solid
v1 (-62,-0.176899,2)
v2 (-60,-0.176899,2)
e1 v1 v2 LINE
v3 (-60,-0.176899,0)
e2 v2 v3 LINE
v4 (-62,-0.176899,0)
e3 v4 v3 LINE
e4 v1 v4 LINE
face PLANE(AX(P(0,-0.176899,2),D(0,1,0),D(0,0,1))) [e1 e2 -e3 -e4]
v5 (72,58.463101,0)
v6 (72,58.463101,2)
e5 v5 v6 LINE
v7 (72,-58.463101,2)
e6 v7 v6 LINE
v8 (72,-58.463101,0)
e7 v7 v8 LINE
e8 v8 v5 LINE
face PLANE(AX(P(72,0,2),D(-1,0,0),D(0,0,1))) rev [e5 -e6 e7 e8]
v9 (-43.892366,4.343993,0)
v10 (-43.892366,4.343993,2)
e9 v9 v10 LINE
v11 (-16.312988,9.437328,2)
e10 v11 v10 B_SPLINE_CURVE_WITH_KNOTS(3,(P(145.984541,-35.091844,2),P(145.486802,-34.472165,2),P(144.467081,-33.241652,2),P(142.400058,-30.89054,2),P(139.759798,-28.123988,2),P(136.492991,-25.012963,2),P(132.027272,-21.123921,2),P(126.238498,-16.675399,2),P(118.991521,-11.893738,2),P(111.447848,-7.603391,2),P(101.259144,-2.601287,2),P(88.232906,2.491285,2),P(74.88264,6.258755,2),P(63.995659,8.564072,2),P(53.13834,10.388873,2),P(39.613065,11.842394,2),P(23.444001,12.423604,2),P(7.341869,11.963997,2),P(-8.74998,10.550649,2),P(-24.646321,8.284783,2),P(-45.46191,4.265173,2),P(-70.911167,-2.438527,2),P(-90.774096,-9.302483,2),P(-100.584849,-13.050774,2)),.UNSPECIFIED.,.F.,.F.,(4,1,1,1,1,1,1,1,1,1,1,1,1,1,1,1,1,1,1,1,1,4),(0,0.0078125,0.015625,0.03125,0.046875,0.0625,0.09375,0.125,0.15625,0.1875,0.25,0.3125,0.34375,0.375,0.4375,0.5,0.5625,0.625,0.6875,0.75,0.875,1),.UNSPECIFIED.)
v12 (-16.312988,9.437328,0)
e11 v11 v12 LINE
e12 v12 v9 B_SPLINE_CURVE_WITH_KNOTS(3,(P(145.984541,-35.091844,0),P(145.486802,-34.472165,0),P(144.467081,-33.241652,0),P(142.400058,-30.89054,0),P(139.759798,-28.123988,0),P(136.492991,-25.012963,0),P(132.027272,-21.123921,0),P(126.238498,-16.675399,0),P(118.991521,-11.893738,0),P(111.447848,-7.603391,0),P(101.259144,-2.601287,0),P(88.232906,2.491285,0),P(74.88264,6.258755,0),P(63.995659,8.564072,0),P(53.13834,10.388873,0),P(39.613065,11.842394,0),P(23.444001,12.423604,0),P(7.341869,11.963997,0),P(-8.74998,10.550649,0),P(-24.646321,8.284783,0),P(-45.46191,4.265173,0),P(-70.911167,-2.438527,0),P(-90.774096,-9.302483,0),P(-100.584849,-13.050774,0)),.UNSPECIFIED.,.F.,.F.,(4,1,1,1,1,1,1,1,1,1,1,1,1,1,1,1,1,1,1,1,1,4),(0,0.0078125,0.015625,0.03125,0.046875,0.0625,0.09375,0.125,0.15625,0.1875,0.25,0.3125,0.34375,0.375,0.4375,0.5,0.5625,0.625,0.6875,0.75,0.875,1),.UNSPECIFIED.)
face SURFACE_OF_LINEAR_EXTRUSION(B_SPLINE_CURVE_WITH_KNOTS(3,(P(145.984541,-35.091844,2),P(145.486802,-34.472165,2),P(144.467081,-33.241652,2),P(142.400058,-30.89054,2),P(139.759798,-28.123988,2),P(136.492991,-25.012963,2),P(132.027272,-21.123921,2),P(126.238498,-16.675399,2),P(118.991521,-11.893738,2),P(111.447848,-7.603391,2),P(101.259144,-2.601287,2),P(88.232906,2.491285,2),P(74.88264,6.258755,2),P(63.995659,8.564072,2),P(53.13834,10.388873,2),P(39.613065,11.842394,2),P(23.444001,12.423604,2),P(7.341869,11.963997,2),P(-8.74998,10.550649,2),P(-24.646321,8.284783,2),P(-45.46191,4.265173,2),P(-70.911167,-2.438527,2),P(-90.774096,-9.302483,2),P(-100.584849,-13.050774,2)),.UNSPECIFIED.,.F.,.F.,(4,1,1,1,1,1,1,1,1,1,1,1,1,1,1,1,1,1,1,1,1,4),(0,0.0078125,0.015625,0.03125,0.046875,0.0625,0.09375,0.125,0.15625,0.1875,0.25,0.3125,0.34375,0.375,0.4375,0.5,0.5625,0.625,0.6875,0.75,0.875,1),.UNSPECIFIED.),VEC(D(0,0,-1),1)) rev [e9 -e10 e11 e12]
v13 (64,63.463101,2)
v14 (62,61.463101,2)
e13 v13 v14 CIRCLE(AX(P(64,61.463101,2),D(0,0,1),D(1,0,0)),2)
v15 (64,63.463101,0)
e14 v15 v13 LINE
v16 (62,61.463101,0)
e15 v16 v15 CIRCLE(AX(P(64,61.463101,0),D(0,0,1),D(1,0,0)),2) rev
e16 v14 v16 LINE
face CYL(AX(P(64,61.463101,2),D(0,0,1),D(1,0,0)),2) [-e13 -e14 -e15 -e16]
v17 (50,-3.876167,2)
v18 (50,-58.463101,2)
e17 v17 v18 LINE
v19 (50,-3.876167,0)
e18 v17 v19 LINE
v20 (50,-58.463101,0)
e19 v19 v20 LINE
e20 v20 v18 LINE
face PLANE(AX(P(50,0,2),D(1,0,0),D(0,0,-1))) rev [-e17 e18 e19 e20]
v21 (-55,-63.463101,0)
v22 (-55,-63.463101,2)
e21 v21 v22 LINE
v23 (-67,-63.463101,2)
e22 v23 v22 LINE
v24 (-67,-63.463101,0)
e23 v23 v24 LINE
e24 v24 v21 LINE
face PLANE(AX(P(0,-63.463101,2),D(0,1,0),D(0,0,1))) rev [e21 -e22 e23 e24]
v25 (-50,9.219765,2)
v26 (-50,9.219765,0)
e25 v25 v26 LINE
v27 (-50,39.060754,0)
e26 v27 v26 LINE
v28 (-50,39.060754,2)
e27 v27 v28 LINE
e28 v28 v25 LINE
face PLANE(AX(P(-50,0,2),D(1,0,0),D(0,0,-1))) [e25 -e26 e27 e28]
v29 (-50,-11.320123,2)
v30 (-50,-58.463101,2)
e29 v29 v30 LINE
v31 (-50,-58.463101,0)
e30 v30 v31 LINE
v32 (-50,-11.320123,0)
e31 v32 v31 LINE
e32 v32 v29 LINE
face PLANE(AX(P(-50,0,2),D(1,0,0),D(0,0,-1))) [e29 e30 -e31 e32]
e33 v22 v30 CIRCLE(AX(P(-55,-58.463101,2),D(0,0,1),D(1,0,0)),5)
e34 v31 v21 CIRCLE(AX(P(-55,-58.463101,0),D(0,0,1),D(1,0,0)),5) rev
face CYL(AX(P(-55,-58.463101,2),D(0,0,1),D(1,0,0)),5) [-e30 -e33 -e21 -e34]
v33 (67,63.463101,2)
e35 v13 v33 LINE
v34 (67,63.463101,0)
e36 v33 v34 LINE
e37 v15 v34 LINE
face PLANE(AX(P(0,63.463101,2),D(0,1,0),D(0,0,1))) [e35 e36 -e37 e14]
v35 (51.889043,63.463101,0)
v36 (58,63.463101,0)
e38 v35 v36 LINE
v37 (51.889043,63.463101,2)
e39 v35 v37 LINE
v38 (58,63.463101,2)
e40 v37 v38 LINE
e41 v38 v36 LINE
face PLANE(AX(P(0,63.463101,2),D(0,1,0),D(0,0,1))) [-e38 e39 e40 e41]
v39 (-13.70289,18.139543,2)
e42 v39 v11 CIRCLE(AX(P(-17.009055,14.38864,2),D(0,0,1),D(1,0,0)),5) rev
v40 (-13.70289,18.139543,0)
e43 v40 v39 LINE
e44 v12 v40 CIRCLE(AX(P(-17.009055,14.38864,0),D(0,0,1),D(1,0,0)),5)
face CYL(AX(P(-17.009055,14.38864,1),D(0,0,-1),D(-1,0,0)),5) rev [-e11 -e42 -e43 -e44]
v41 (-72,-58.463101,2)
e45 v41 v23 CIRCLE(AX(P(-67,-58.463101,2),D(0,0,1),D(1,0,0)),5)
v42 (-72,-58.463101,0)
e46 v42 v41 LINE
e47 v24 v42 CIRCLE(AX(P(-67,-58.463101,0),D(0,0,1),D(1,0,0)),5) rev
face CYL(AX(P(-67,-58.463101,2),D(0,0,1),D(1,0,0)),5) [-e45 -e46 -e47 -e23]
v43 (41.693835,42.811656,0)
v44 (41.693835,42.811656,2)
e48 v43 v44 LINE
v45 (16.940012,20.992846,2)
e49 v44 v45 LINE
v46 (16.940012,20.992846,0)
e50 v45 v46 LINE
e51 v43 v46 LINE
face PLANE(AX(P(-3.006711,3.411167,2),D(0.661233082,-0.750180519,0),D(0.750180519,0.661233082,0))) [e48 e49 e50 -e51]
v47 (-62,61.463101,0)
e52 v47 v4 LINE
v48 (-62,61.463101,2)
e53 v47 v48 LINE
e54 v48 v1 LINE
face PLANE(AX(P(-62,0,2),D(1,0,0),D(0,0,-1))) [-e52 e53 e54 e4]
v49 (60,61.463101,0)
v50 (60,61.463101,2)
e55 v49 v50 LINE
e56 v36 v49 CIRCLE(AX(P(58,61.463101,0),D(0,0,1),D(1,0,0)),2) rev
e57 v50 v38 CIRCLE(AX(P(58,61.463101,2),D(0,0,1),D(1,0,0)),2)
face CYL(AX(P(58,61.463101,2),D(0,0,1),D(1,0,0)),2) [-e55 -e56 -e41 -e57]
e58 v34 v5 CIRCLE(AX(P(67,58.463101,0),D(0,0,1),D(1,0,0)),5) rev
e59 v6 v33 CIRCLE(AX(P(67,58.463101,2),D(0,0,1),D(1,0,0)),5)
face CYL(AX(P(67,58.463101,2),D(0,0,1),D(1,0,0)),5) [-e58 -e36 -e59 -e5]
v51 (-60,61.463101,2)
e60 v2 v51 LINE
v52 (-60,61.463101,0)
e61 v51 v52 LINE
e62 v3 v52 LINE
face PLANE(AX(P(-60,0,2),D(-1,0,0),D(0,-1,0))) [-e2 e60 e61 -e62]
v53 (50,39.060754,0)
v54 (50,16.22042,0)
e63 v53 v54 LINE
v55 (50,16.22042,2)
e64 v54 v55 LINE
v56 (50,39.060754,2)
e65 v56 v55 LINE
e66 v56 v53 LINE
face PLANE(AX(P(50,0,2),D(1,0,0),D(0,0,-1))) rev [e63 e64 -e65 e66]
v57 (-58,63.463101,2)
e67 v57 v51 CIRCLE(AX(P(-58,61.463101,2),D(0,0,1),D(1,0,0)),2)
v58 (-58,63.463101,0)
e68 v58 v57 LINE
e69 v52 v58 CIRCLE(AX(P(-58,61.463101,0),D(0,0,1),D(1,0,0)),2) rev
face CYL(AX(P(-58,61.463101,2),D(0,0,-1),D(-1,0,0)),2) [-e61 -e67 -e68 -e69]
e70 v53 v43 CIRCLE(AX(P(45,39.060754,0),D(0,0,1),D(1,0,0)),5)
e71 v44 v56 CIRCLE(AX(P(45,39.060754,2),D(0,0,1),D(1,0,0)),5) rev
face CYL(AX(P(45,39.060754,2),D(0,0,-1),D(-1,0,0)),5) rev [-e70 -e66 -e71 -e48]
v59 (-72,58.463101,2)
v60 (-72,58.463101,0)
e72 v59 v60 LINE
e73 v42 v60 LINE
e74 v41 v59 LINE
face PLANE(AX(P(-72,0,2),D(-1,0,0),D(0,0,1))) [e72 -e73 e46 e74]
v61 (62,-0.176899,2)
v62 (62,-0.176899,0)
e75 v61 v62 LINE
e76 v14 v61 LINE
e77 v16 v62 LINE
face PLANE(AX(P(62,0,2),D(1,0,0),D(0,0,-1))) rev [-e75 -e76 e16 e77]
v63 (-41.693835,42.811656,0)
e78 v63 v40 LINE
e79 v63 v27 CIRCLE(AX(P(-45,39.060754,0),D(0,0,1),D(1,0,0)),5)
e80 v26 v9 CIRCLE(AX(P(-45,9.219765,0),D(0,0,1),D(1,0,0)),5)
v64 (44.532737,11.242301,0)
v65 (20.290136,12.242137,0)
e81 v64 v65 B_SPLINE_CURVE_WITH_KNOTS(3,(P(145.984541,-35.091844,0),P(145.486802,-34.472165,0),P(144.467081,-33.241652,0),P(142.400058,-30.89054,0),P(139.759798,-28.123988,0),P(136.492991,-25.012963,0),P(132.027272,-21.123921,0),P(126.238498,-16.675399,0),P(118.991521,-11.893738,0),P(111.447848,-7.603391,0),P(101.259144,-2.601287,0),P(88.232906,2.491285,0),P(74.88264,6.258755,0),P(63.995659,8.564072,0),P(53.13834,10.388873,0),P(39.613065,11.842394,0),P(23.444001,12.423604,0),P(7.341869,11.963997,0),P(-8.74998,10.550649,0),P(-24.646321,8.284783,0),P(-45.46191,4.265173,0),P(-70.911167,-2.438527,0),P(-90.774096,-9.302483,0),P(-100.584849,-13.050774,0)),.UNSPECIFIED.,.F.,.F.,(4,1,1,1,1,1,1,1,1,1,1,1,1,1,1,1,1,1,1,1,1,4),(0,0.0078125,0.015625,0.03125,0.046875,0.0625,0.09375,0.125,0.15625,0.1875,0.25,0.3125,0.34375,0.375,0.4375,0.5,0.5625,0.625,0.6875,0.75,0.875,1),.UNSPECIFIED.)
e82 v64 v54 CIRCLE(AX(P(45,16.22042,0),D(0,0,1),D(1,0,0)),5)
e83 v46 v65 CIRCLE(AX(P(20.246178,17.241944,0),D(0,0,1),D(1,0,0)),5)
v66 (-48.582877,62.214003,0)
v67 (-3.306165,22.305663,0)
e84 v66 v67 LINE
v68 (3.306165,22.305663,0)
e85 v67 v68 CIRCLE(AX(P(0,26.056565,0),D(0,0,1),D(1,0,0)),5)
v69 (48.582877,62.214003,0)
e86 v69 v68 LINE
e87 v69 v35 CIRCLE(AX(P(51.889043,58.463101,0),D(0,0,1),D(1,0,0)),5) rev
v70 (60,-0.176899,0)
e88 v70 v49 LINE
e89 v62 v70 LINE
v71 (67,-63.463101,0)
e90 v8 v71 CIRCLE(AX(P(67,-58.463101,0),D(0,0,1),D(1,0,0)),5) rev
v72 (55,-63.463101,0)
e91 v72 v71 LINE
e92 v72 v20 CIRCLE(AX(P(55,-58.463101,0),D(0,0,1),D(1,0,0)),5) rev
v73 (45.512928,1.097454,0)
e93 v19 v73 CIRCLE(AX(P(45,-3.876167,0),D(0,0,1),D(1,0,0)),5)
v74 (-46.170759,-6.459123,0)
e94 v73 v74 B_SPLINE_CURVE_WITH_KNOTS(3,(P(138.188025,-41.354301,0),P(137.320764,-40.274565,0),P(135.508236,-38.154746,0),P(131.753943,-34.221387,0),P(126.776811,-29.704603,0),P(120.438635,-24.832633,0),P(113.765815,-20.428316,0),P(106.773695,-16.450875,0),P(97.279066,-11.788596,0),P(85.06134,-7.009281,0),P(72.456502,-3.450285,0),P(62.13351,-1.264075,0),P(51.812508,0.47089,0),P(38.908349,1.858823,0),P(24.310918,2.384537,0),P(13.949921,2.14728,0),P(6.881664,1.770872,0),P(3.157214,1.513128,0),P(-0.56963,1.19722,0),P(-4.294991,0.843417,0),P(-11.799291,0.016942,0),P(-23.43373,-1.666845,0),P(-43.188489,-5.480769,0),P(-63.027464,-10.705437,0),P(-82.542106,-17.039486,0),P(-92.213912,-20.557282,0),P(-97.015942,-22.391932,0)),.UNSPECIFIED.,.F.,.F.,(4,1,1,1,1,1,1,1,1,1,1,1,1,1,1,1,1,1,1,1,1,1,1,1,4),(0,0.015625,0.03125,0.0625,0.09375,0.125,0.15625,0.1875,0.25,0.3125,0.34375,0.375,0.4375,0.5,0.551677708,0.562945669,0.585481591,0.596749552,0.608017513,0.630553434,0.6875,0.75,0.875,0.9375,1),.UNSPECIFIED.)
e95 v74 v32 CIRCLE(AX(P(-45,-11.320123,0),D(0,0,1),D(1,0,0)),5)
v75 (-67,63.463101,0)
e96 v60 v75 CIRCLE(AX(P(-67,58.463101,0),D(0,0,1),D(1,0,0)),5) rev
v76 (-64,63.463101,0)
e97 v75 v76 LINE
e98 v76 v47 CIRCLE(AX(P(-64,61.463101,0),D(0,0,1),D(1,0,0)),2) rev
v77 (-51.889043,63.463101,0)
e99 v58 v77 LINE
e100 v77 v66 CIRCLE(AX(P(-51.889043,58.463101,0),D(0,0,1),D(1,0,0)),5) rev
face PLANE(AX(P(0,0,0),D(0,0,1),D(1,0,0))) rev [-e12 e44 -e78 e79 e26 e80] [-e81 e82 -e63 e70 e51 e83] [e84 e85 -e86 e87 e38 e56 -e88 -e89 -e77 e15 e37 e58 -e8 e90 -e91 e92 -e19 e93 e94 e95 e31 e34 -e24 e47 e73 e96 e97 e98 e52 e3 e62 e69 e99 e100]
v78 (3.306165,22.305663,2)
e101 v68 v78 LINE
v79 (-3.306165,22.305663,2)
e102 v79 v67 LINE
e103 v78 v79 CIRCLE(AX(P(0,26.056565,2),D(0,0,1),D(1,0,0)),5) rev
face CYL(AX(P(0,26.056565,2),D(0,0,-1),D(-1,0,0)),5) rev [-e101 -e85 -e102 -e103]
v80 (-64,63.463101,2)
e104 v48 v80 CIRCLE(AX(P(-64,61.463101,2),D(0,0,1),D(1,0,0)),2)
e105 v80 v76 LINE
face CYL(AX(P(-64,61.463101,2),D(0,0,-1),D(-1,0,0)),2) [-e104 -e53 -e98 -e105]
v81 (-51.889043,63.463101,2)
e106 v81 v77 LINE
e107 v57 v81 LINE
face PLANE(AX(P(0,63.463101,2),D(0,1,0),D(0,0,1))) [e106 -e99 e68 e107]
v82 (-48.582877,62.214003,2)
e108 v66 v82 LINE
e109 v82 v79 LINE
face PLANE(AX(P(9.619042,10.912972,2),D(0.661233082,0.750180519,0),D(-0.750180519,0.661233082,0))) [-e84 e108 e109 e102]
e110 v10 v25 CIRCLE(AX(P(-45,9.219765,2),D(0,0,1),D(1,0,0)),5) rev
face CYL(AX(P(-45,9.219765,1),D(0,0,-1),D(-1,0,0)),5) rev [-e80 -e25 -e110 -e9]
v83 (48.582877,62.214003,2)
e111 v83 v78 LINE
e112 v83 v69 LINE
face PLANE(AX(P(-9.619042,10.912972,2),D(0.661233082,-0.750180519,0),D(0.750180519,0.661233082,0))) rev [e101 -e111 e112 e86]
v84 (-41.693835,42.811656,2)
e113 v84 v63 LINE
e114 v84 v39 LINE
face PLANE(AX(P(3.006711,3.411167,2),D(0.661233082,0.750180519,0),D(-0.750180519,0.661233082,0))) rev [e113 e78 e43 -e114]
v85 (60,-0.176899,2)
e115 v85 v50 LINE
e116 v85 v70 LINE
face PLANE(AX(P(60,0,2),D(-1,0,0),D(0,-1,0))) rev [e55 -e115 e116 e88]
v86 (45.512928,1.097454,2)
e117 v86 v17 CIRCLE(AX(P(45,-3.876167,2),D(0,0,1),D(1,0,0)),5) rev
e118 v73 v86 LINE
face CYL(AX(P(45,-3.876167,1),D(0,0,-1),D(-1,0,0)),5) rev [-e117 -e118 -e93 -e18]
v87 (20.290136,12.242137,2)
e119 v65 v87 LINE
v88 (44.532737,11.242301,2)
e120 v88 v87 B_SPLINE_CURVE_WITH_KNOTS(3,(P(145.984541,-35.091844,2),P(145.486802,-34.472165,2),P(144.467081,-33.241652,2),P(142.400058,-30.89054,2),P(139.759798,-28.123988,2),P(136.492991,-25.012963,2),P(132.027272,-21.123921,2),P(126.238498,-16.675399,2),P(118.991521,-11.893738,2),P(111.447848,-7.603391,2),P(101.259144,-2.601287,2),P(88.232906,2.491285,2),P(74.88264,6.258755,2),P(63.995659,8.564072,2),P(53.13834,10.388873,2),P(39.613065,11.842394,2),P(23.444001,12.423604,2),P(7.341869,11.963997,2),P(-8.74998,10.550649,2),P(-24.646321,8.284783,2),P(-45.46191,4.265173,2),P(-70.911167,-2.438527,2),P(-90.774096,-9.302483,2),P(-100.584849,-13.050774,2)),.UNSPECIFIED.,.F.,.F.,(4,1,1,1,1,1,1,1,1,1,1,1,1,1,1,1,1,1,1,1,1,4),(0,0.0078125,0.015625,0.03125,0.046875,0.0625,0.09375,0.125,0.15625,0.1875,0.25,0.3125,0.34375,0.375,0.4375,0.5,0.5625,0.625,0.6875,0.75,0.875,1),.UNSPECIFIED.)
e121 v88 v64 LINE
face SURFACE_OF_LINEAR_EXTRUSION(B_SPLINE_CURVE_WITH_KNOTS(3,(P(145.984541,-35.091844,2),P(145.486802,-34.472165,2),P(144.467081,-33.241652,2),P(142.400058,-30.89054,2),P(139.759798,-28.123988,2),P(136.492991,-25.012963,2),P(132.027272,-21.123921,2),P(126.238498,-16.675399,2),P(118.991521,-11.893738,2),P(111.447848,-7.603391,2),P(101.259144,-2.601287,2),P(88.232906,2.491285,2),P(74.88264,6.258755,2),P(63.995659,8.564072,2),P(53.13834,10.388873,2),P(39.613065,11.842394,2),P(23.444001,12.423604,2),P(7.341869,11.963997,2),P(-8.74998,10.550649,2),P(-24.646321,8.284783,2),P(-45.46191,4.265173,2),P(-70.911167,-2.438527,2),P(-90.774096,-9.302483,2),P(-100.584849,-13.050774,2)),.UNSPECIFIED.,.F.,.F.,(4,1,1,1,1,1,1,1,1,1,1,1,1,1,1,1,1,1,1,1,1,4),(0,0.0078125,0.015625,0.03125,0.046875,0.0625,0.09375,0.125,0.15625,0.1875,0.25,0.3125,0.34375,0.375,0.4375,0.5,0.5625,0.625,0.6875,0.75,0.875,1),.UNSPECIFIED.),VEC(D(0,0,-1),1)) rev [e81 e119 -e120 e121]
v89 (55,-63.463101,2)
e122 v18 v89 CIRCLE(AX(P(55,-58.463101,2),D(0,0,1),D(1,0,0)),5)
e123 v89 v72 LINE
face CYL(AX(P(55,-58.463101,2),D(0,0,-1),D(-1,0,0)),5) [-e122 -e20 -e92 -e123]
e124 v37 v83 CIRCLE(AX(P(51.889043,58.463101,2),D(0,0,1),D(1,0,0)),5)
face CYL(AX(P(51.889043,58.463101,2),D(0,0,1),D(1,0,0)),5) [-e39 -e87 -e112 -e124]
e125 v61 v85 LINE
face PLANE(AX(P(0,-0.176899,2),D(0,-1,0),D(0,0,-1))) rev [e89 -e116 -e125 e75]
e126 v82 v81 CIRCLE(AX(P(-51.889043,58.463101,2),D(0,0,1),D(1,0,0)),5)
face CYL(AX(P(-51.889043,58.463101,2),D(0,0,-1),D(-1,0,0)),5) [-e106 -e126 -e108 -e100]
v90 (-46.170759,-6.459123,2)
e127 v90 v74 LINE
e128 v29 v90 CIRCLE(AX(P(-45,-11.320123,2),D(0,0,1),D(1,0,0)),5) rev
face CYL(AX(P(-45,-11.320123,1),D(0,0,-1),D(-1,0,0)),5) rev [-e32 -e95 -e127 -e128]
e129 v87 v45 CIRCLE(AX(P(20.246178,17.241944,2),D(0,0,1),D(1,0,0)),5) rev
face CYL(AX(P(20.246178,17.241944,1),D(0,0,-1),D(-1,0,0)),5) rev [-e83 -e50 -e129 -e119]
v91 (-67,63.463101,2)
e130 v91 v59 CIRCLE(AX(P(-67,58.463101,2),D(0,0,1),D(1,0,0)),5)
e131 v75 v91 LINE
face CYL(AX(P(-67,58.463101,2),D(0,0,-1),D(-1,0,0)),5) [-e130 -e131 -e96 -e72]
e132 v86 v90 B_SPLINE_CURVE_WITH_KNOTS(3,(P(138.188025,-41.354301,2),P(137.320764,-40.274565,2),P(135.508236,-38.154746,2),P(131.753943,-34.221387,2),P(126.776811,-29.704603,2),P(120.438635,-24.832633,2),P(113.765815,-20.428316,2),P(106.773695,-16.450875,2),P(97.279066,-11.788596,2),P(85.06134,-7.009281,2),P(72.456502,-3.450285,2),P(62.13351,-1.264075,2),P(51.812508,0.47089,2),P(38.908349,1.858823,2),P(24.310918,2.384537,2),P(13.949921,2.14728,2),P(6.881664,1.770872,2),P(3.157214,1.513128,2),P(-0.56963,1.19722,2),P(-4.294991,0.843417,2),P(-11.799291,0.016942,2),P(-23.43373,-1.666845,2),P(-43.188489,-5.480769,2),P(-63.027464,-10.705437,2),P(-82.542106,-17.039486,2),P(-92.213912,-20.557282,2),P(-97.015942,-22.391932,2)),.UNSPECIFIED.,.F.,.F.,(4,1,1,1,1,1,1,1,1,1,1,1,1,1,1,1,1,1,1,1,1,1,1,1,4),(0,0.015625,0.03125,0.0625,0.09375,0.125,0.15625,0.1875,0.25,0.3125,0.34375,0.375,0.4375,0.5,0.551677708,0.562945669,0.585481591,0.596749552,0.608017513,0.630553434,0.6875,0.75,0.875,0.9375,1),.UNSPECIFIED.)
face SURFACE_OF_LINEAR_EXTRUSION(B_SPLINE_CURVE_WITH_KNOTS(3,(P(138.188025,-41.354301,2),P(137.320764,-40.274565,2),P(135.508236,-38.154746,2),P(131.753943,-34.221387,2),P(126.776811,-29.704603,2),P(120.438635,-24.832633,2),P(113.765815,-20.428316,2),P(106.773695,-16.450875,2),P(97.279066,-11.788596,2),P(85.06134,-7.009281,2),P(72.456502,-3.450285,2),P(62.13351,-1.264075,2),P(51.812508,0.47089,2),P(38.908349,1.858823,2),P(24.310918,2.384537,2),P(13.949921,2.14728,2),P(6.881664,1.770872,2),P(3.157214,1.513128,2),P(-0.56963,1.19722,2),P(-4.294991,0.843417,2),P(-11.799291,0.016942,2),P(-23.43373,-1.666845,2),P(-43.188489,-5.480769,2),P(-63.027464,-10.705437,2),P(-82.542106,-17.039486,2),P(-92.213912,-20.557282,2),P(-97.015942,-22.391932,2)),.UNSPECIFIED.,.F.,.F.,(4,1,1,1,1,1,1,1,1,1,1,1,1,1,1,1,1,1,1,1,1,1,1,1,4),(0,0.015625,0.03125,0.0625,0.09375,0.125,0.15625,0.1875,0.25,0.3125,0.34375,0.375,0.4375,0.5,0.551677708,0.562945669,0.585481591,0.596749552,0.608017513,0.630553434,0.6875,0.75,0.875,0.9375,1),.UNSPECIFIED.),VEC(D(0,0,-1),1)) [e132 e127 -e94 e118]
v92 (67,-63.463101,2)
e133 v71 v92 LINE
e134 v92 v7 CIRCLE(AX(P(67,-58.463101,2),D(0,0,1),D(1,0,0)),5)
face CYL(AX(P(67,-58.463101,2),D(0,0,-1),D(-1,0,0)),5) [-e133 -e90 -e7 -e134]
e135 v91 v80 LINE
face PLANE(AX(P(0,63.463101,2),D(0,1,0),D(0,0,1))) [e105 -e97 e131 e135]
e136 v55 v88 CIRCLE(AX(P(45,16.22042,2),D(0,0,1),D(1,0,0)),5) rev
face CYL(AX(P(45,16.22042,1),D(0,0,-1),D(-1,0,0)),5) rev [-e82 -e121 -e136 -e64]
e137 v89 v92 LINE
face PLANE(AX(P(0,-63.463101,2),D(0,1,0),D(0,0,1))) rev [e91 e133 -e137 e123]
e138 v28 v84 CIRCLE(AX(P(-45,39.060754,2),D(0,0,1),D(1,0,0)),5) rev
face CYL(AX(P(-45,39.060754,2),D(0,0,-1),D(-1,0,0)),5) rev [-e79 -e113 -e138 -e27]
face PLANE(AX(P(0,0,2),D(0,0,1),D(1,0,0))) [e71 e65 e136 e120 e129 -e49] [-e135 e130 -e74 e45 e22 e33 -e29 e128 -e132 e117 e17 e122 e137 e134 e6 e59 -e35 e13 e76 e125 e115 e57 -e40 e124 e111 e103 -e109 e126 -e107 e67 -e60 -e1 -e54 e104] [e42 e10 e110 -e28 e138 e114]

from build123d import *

# Parameters (mm, degrees)
BOSS_EXTRUDE1_DEPTH = 2
FILLET1_R           = 5
FILLET3_R           = 2
FILLET4_R           = 5


# Read off the part's stored shape, not the designer's step: Boss-Extrude1
with BuildPart() as part:
    # Boss-Extrude1 outline → Boss-Extrude1 (new body)
    with BuildSketch(Plane.XY):
        with BuildLine():
            add(Edge.make_bspline(
                [(50, 0.585067943), (46.302901229, 1.048620246), (37.443381796, 1.911582539), (24.310917963, 2.384537211), (13.949921349, 2.147279936), (6.881664213, 1.770872157), (3.157213928, 1.513128323), (-0.569629629, 1.197220359), (-4.294991328, 0.843416739), (-11.799290896, 0.01694185), (-23.43372993, -1.666844937), (-37.093919746, -4.304130089), (-46.054304433, -6.407794893), (-49.999999999, -7.403419123)],
                knots=[0.392731, 0.392731, 0.392731, 0.392731, 0.4375, 0.5, 0.551677708, 0.562945669, 0.585481591, 0.596749552, 0.608017513, 0.630553434, 0.6875, 0.75, 0.799585435, 0.799585435, 0.799585435, 0.799585435], degree=3))
            Line((50, 0.585067943), (50, -63.46310087))
            Line((50, -63.46310087), (72, -63.46310087))
            Line((72, -63.46310087), (72, 63.46310087))
            Line((72, 63.46310087), (62, 63.46310087))
            Line((62, 63.46310087), (62, -0.17689913))
            Line((62, -0.17689913), (60, -0.17689913))
            Line((60, -0.17689913), (60, 63.46310087))
            Line((60, 63.46310087), (50, 63.46310087))
            Line((50, 63.46310087), (0, 19.391503044))
            Line((0, 19.391503044), (-50, 63.46310087))
            Line((-50, 63.46310087), (-60, 63.46310087))
            Line((-60, 63.46310087), (-60, -0.17689913))
            Line((-60, -0.17689913), (-62, -0.17689913))
            Line((-62, -0.17689913), (-62, 63.46310087))
            Line((-62, 63.46310087), (-72, 63.46310087))
            Line((-72, 63.46310087), (-72, -63.46310087))
            Line((-72, -63.46310087), (-50, -63.46310087))
            Line((-50, -63.46310087), (-49.999999999, -7.403419123))
        make_face()
        with BuildLine():
            add(Edge.make_bspline(
                [(-5.349354195, 10.7764699), (-6.473284635, 10.660224491), (-12.934279192, 9.954218876), (-24.646320739, 8.284783337), (-38.353198567, 5.637906199), (-46.754684535, 3.697054478), (-49.999999999, 2.901338723)],
                knots=[0.611854507, 0.611854507, 0.611854507, 0.611854507, 0.625, 0.6875, 0.75, 0.789622747, 0.789622747, 0.789622747, 0.789622747], degree=3))
            Line((-49.999999999, 2.901338723), (-50, 50.132975987))
            Line((-50, 50.132975987), (-5.349354195, 10.7764699))
        make_face(mode=Mode.SUBTRACT)
        with BuildLine():
            Line((50, 50.132975987), (50, 10.659702462))
            add(Edge.make_bspline(
                [(50, 10.659702462), (46.536536843, 11.073334631), (37.671385716, 11.912189244), (23.444000892, 12.423604272), (12.413305008, 12.108752618), (6.751894701, 11.770134287), (6.456063808, 11.751959115)],
                knots=[0.397516142, 0.397516142, 0.397516142, 0.397516142, 0.4375, 0.5, 0.5625, 0.565946061, 0.565946061, 0.565946061, 0.565946061], degree=3))
            Line((6.456063808, 11.751959115), (50, 50.132975987))
        make_face(mode=Mode.SUBTRACT)
    extrude(amount=BOSS_EXTRUDE1_DEPTH)

    # Fillet1
    fillet1_edges = [part.edges().sort_by_distance(p)[0] for p in [
        (-72, -63.46310087, 1),
        (-72, 63.46310087, 1),
        (-50, 63.46310087, 1),
        (50, 63.46310087, 1),
        (72, 63.46310087, 1),
        (50, 0.585067943, 1),
        (72, -63.46310087, 1),
        (50, -63.46310087, 1),
        (-50, -63.46310087, 1),
        (-49.999999999, -7.403419123, 1),
        (0, 19.391503044, 1),
    ]]
    fillet(fillet1_edges, radius=FILLET1_R)

    # Fillet3
    fillet3_edges = [part.edges().sort_by_distance(p)[0] for p in [
        (-62, 63.46310087, 1),
        (-60, 63.46310087, 1),
        (60, 63.46310087, 1),
        (62, 63.46310087, 1),
    ]]
    fillet(fillet3_edges, radius=FILLET3_R)

    # Fillet4
    fillet4_edges = [part.edges().sort_by_distance(p)[0] for p in [
        (50, 50.132975987, 1),
        (6.456063808, 11.751959115, 1),
        (50, 10.659702462, 1),
        (-50, 50.132975987, 1),
        (-49.999999999, 2.901338723, 1),
        (-5.349354195, 10.7764699, 1),
    ]]
    fillet(fillet4_edges, radius=FILLET4_R)


solid = part.part
